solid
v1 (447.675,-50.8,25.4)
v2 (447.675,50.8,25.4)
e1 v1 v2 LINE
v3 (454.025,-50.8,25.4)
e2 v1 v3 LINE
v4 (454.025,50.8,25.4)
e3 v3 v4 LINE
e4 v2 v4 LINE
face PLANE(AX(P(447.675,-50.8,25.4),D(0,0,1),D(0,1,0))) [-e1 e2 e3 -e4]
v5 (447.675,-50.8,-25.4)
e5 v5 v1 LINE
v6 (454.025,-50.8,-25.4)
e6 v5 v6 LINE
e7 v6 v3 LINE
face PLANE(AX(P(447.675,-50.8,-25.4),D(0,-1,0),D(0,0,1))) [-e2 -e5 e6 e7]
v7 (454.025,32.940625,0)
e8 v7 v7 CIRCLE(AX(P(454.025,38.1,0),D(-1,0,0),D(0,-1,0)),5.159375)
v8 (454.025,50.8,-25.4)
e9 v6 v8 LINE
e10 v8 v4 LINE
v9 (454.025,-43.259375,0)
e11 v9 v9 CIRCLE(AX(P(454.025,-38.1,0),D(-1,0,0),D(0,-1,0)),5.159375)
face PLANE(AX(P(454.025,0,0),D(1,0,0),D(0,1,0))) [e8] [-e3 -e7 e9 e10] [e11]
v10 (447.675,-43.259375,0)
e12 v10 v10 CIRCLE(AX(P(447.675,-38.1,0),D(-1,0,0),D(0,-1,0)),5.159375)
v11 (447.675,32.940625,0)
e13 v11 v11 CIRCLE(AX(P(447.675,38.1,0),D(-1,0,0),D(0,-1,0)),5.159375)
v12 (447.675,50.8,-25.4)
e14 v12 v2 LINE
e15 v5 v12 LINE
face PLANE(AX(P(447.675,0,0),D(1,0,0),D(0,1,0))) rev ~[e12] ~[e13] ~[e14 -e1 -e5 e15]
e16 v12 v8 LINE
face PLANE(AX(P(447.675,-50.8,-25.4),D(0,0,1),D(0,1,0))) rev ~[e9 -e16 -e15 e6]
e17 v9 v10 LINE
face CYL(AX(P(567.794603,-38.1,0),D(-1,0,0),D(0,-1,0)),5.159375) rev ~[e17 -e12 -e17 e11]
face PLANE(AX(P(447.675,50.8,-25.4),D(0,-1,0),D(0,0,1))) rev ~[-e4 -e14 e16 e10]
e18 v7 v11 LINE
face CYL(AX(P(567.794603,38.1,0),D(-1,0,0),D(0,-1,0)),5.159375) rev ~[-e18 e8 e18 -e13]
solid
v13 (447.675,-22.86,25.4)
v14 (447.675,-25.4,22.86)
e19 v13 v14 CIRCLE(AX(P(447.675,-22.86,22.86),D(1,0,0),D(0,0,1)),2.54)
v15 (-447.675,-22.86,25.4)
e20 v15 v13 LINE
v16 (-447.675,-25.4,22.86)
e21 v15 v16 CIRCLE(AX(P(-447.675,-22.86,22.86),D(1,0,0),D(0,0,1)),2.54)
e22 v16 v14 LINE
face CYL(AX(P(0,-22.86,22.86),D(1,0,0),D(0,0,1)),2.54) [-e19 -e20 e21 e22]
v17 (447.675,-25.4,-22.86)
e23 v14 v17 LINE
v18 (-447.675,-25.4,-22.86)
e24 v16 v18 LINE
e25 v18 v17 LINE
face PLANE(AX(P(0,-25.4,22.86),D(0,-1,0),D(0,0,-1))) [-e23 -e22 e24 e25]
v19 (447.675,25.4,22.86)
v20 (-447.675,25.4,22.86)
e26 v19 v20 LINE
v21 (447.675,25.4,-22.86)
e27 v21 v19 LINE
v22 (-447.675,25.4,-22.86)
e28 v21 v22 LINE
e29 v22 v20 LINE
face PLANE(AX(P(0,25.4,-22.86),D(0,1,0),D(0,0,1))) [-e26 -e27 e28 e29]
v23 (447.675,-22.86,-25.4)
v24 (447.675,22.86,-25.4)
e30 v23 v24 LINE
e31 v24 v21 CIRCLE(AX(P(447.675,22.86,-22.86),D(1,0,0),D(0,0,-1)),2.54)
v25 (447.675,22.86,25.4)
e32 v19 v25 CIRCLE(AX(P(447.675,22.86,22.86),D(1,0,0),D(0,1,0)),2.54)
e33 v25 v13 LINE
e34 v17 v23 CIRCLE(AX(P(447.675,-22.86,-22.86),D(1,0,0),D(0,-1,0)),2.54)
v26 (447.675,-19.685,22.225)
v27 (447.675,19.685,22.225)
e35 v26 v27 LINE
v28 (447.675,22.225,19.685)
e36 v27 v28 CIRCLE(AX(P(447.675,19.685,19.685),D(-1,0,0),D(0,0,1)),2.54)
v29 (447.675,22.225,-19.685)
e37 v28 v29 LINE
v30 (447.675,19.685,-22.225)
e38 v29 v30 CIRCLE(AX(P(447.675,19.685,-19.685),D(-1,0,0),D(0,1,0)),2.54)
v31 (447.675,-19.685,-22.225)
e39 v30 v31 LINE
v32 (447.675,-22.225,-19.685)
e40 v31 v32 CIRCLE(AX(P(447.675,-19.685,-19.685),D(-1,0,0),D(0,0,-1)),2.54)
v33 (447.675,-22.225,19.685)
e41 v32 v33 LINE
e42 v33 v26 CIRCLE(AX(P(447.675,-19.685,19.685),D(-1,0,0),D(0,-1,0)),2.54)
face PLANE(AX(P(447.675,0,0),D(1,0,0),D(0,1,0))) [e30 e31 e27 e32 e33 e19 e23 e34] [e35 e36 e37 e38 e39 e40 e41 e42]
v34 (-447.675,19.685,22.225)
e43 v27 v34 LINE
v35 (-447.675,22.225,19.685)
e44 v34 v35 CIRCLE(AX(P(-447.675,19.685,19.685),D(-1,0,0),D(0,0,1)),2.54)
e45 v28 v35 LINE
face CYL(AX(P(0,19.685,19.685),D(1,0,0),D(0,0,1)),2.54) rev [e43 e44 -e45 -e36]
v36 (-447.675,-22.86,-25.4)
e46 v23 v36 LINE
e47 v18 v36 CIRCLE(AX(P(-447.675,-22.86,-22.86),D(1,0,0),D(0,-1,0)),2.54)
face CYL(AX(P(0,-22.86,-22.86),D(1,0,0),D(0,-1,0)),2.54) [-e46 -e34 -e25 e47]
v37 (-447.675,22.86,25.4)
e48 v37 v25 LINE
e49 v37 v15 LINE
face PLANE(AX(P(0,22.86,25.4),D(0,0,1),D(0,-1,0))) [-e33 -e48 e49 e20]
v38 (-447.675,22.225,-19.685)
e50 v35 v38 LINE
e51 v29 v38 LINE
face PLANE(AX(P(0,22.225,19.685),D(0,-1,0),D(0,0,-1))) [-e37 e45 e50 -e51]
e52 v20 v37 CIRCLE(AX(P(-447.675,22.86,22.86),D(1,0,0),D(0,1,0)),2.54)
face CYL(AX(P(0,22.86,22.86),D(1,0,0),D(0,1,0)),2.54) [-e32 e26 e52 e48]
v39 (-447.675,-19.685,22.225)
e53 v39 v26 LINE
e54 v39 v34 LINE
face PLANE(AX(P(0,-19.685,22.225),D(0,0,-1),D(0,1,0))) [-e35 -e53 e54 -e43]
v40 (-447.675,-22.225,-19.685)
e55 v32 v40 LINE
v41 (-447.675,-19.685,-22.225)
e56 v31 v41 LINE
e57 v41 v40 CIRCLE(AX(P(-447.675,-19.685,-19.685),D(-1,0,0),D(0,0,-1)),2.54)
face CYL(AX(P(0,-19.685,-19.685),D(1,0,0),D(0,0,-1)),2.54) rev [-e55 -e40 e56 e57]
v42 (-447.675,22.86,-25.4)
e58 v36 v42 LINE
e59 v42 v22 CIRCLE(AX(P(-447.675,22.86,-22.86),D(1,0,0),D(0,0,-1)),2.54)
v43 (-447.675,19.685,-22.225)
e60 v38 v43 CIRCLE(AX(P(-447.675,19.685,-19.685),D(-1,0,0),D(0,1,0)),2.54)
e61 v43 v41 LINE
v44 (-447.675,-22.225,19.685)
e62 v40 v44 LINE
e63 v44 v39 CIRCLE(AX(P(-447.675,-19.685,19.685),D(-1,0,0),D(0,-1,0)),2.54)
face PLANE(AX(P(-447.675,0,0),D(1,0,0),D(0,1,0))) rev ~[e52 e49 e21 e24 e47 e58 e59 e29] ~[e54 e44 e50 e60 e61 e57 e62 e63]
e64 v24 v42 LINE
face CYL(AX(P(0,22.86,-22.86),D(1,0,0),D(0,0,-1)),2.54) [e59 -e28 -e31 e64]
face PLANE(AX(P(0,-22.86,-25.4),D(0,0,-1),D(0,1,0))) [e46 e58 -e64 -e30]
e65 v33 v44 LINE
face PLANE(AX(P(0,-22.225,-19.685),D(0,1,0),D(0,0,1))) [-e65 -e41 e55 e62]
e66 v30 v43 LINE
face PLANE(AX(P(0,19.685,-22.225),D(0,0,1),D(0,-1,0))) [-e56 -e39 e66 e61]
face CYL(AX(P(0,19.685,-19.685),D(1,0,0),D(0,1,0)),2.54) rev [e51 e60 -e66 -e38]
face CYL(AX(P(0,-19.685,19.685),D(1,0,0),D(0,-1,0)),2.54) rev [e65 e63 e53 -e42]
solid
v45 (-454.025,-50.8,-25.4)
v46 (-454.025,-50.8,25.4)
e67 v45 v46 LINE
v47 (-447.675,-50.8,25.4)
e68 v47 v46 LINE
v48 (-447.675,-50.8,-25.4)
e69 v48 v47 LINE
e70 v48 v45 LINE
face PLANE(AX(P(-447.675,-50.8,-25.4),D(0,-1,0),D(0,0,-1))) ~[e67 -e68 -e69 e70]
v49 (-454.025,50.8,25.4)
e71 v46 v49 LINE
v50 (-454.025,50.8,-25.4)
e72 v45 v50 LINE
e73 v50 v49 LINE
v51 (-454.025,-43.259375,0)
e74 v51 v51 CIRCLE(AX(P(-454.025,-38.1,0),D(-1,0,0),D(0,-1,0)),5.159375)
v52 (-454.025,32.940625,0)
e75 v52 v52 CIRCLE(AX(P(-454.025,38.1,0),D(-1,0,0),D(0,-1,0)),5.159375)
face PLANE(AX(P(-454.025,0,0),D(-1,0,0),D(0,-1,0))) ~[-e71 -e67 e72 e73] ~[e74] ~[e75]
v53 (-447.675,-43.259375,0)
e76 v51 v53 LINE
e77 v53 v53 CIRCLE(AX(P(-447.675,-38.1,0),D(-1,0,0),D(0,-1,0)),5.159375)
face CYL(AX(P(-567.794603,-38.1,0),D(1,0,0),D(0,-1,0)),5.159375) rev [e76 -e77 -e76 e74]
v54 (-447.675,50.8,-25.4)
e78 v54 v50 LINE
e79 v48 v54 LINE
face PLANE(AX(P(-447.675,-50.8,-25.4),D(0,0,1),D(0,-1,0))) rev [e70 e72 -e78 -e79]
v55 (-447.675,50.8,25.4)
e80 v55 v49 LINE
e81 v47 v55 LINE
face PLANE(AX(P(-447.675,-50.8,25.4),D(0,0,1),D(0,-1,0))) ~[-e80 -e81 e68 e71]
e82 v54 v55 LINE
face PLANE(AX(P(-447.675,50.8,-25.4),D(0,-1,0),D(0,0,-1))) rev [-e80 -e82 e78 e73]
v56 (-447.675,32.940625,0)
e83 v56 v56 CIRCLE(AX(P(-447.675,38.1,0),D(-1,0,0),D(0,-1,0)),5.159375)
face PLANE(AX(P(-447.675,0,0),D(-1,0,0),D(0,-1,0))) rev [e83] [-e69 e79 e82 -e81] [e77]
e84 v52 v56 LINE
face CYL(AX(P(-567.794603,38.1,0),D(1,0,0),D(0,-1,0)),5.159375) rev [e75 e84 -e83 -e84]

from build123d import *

# Parameters (mm, degrees)
F1_DEPTH = 447.675
F2_W     = 101.6
F2_H     = 50.8
F3_DEPTH = 6.35
F5_D     = 10.31875


# Not quite as in the source:
# - a length typed as a fraction of an inch, garbled in the dataset ("3 / 203.2 mm" for 3/8 in), is restored


with BuildPart() as f1:
    # F0 (on Right) → F1 (new body, symmetric)
    with BuildSketch(Plane.YZ):
        with BuildLine():
            ThreePointArc((25.4, 22.86), (24.6560512242, 24.6560512242), (22.86, 25.4))
            Line((22.86, 25.4), (-22.86, 25.4))
            ThreePointArc((-22.86, 25.4), (-24.6560512242, 24.6560512242), (-25.4, 22.86))
            Line((-25.4, 22.86), (-25.4, -22.86))
            ThreePointArc((-25.4, -22.86), (-24.6560512242, -24.6560512242), (-22.86, -25.4))
            Line((-22.86, -25.4), (22.86, -25.4))
            ThreePointArc((22.86, -25.4), (24.6560512242, -24.6560512242), (25.4, -22.86))
            Line((25.4, -22.86), (25.4, 22.86))
        make_face()
        with BuildLine():
            Line((-19.685, 22.225), (19.685, 22.225))
            ThreePointArc((19.685, 22.225), (21.4810512242, 21.4810512242), (22.225, 19.685))
            Line((22.225, 19.685), (22.225, -19.685))
            ThreePointArc((22.225, -19.685), (21.4810512242, -21.4810512242), (19.685, -22.225))
            Line((19.685, -22.225), (-19.685, -22.225))
            ThreePointArc((-19.685, -22.225), (-21.4810512242, -21.4810512242), (-22.225, -19.685))
            Line((-22.225, -19.685), (-22.225, 19.685))
            ThreePointArc((-22.225, 19.685), (-21.4810512242, 21.4810512242), (-19.685, 22.225))
        make_face(mode=Mode.SUBTRACT)
    extrude(amount=F1_DEPTH, both=True)


with BuildPart() as f3:
    # F2 (on face) → F3 (new body)
    with BuildSketch(Plane.YZ.offset(447.675)):
        Rectangle(F2_W, F2_H)
    extrude(amount=F3_DEPTH)

    # F5 (through all)
    with Locations(Plane.YZ.offset(454.025)):
        with Locations((-38.1, 0), (38.1, 0)):
            Hole(F5_D / 2)


with BuildPart() as f6_1:
    # F6: instance of F3
    add(f3.part.mirror(Plane.YZ))


solid = Compound([f1.part, f3.part, f6_1.part])
